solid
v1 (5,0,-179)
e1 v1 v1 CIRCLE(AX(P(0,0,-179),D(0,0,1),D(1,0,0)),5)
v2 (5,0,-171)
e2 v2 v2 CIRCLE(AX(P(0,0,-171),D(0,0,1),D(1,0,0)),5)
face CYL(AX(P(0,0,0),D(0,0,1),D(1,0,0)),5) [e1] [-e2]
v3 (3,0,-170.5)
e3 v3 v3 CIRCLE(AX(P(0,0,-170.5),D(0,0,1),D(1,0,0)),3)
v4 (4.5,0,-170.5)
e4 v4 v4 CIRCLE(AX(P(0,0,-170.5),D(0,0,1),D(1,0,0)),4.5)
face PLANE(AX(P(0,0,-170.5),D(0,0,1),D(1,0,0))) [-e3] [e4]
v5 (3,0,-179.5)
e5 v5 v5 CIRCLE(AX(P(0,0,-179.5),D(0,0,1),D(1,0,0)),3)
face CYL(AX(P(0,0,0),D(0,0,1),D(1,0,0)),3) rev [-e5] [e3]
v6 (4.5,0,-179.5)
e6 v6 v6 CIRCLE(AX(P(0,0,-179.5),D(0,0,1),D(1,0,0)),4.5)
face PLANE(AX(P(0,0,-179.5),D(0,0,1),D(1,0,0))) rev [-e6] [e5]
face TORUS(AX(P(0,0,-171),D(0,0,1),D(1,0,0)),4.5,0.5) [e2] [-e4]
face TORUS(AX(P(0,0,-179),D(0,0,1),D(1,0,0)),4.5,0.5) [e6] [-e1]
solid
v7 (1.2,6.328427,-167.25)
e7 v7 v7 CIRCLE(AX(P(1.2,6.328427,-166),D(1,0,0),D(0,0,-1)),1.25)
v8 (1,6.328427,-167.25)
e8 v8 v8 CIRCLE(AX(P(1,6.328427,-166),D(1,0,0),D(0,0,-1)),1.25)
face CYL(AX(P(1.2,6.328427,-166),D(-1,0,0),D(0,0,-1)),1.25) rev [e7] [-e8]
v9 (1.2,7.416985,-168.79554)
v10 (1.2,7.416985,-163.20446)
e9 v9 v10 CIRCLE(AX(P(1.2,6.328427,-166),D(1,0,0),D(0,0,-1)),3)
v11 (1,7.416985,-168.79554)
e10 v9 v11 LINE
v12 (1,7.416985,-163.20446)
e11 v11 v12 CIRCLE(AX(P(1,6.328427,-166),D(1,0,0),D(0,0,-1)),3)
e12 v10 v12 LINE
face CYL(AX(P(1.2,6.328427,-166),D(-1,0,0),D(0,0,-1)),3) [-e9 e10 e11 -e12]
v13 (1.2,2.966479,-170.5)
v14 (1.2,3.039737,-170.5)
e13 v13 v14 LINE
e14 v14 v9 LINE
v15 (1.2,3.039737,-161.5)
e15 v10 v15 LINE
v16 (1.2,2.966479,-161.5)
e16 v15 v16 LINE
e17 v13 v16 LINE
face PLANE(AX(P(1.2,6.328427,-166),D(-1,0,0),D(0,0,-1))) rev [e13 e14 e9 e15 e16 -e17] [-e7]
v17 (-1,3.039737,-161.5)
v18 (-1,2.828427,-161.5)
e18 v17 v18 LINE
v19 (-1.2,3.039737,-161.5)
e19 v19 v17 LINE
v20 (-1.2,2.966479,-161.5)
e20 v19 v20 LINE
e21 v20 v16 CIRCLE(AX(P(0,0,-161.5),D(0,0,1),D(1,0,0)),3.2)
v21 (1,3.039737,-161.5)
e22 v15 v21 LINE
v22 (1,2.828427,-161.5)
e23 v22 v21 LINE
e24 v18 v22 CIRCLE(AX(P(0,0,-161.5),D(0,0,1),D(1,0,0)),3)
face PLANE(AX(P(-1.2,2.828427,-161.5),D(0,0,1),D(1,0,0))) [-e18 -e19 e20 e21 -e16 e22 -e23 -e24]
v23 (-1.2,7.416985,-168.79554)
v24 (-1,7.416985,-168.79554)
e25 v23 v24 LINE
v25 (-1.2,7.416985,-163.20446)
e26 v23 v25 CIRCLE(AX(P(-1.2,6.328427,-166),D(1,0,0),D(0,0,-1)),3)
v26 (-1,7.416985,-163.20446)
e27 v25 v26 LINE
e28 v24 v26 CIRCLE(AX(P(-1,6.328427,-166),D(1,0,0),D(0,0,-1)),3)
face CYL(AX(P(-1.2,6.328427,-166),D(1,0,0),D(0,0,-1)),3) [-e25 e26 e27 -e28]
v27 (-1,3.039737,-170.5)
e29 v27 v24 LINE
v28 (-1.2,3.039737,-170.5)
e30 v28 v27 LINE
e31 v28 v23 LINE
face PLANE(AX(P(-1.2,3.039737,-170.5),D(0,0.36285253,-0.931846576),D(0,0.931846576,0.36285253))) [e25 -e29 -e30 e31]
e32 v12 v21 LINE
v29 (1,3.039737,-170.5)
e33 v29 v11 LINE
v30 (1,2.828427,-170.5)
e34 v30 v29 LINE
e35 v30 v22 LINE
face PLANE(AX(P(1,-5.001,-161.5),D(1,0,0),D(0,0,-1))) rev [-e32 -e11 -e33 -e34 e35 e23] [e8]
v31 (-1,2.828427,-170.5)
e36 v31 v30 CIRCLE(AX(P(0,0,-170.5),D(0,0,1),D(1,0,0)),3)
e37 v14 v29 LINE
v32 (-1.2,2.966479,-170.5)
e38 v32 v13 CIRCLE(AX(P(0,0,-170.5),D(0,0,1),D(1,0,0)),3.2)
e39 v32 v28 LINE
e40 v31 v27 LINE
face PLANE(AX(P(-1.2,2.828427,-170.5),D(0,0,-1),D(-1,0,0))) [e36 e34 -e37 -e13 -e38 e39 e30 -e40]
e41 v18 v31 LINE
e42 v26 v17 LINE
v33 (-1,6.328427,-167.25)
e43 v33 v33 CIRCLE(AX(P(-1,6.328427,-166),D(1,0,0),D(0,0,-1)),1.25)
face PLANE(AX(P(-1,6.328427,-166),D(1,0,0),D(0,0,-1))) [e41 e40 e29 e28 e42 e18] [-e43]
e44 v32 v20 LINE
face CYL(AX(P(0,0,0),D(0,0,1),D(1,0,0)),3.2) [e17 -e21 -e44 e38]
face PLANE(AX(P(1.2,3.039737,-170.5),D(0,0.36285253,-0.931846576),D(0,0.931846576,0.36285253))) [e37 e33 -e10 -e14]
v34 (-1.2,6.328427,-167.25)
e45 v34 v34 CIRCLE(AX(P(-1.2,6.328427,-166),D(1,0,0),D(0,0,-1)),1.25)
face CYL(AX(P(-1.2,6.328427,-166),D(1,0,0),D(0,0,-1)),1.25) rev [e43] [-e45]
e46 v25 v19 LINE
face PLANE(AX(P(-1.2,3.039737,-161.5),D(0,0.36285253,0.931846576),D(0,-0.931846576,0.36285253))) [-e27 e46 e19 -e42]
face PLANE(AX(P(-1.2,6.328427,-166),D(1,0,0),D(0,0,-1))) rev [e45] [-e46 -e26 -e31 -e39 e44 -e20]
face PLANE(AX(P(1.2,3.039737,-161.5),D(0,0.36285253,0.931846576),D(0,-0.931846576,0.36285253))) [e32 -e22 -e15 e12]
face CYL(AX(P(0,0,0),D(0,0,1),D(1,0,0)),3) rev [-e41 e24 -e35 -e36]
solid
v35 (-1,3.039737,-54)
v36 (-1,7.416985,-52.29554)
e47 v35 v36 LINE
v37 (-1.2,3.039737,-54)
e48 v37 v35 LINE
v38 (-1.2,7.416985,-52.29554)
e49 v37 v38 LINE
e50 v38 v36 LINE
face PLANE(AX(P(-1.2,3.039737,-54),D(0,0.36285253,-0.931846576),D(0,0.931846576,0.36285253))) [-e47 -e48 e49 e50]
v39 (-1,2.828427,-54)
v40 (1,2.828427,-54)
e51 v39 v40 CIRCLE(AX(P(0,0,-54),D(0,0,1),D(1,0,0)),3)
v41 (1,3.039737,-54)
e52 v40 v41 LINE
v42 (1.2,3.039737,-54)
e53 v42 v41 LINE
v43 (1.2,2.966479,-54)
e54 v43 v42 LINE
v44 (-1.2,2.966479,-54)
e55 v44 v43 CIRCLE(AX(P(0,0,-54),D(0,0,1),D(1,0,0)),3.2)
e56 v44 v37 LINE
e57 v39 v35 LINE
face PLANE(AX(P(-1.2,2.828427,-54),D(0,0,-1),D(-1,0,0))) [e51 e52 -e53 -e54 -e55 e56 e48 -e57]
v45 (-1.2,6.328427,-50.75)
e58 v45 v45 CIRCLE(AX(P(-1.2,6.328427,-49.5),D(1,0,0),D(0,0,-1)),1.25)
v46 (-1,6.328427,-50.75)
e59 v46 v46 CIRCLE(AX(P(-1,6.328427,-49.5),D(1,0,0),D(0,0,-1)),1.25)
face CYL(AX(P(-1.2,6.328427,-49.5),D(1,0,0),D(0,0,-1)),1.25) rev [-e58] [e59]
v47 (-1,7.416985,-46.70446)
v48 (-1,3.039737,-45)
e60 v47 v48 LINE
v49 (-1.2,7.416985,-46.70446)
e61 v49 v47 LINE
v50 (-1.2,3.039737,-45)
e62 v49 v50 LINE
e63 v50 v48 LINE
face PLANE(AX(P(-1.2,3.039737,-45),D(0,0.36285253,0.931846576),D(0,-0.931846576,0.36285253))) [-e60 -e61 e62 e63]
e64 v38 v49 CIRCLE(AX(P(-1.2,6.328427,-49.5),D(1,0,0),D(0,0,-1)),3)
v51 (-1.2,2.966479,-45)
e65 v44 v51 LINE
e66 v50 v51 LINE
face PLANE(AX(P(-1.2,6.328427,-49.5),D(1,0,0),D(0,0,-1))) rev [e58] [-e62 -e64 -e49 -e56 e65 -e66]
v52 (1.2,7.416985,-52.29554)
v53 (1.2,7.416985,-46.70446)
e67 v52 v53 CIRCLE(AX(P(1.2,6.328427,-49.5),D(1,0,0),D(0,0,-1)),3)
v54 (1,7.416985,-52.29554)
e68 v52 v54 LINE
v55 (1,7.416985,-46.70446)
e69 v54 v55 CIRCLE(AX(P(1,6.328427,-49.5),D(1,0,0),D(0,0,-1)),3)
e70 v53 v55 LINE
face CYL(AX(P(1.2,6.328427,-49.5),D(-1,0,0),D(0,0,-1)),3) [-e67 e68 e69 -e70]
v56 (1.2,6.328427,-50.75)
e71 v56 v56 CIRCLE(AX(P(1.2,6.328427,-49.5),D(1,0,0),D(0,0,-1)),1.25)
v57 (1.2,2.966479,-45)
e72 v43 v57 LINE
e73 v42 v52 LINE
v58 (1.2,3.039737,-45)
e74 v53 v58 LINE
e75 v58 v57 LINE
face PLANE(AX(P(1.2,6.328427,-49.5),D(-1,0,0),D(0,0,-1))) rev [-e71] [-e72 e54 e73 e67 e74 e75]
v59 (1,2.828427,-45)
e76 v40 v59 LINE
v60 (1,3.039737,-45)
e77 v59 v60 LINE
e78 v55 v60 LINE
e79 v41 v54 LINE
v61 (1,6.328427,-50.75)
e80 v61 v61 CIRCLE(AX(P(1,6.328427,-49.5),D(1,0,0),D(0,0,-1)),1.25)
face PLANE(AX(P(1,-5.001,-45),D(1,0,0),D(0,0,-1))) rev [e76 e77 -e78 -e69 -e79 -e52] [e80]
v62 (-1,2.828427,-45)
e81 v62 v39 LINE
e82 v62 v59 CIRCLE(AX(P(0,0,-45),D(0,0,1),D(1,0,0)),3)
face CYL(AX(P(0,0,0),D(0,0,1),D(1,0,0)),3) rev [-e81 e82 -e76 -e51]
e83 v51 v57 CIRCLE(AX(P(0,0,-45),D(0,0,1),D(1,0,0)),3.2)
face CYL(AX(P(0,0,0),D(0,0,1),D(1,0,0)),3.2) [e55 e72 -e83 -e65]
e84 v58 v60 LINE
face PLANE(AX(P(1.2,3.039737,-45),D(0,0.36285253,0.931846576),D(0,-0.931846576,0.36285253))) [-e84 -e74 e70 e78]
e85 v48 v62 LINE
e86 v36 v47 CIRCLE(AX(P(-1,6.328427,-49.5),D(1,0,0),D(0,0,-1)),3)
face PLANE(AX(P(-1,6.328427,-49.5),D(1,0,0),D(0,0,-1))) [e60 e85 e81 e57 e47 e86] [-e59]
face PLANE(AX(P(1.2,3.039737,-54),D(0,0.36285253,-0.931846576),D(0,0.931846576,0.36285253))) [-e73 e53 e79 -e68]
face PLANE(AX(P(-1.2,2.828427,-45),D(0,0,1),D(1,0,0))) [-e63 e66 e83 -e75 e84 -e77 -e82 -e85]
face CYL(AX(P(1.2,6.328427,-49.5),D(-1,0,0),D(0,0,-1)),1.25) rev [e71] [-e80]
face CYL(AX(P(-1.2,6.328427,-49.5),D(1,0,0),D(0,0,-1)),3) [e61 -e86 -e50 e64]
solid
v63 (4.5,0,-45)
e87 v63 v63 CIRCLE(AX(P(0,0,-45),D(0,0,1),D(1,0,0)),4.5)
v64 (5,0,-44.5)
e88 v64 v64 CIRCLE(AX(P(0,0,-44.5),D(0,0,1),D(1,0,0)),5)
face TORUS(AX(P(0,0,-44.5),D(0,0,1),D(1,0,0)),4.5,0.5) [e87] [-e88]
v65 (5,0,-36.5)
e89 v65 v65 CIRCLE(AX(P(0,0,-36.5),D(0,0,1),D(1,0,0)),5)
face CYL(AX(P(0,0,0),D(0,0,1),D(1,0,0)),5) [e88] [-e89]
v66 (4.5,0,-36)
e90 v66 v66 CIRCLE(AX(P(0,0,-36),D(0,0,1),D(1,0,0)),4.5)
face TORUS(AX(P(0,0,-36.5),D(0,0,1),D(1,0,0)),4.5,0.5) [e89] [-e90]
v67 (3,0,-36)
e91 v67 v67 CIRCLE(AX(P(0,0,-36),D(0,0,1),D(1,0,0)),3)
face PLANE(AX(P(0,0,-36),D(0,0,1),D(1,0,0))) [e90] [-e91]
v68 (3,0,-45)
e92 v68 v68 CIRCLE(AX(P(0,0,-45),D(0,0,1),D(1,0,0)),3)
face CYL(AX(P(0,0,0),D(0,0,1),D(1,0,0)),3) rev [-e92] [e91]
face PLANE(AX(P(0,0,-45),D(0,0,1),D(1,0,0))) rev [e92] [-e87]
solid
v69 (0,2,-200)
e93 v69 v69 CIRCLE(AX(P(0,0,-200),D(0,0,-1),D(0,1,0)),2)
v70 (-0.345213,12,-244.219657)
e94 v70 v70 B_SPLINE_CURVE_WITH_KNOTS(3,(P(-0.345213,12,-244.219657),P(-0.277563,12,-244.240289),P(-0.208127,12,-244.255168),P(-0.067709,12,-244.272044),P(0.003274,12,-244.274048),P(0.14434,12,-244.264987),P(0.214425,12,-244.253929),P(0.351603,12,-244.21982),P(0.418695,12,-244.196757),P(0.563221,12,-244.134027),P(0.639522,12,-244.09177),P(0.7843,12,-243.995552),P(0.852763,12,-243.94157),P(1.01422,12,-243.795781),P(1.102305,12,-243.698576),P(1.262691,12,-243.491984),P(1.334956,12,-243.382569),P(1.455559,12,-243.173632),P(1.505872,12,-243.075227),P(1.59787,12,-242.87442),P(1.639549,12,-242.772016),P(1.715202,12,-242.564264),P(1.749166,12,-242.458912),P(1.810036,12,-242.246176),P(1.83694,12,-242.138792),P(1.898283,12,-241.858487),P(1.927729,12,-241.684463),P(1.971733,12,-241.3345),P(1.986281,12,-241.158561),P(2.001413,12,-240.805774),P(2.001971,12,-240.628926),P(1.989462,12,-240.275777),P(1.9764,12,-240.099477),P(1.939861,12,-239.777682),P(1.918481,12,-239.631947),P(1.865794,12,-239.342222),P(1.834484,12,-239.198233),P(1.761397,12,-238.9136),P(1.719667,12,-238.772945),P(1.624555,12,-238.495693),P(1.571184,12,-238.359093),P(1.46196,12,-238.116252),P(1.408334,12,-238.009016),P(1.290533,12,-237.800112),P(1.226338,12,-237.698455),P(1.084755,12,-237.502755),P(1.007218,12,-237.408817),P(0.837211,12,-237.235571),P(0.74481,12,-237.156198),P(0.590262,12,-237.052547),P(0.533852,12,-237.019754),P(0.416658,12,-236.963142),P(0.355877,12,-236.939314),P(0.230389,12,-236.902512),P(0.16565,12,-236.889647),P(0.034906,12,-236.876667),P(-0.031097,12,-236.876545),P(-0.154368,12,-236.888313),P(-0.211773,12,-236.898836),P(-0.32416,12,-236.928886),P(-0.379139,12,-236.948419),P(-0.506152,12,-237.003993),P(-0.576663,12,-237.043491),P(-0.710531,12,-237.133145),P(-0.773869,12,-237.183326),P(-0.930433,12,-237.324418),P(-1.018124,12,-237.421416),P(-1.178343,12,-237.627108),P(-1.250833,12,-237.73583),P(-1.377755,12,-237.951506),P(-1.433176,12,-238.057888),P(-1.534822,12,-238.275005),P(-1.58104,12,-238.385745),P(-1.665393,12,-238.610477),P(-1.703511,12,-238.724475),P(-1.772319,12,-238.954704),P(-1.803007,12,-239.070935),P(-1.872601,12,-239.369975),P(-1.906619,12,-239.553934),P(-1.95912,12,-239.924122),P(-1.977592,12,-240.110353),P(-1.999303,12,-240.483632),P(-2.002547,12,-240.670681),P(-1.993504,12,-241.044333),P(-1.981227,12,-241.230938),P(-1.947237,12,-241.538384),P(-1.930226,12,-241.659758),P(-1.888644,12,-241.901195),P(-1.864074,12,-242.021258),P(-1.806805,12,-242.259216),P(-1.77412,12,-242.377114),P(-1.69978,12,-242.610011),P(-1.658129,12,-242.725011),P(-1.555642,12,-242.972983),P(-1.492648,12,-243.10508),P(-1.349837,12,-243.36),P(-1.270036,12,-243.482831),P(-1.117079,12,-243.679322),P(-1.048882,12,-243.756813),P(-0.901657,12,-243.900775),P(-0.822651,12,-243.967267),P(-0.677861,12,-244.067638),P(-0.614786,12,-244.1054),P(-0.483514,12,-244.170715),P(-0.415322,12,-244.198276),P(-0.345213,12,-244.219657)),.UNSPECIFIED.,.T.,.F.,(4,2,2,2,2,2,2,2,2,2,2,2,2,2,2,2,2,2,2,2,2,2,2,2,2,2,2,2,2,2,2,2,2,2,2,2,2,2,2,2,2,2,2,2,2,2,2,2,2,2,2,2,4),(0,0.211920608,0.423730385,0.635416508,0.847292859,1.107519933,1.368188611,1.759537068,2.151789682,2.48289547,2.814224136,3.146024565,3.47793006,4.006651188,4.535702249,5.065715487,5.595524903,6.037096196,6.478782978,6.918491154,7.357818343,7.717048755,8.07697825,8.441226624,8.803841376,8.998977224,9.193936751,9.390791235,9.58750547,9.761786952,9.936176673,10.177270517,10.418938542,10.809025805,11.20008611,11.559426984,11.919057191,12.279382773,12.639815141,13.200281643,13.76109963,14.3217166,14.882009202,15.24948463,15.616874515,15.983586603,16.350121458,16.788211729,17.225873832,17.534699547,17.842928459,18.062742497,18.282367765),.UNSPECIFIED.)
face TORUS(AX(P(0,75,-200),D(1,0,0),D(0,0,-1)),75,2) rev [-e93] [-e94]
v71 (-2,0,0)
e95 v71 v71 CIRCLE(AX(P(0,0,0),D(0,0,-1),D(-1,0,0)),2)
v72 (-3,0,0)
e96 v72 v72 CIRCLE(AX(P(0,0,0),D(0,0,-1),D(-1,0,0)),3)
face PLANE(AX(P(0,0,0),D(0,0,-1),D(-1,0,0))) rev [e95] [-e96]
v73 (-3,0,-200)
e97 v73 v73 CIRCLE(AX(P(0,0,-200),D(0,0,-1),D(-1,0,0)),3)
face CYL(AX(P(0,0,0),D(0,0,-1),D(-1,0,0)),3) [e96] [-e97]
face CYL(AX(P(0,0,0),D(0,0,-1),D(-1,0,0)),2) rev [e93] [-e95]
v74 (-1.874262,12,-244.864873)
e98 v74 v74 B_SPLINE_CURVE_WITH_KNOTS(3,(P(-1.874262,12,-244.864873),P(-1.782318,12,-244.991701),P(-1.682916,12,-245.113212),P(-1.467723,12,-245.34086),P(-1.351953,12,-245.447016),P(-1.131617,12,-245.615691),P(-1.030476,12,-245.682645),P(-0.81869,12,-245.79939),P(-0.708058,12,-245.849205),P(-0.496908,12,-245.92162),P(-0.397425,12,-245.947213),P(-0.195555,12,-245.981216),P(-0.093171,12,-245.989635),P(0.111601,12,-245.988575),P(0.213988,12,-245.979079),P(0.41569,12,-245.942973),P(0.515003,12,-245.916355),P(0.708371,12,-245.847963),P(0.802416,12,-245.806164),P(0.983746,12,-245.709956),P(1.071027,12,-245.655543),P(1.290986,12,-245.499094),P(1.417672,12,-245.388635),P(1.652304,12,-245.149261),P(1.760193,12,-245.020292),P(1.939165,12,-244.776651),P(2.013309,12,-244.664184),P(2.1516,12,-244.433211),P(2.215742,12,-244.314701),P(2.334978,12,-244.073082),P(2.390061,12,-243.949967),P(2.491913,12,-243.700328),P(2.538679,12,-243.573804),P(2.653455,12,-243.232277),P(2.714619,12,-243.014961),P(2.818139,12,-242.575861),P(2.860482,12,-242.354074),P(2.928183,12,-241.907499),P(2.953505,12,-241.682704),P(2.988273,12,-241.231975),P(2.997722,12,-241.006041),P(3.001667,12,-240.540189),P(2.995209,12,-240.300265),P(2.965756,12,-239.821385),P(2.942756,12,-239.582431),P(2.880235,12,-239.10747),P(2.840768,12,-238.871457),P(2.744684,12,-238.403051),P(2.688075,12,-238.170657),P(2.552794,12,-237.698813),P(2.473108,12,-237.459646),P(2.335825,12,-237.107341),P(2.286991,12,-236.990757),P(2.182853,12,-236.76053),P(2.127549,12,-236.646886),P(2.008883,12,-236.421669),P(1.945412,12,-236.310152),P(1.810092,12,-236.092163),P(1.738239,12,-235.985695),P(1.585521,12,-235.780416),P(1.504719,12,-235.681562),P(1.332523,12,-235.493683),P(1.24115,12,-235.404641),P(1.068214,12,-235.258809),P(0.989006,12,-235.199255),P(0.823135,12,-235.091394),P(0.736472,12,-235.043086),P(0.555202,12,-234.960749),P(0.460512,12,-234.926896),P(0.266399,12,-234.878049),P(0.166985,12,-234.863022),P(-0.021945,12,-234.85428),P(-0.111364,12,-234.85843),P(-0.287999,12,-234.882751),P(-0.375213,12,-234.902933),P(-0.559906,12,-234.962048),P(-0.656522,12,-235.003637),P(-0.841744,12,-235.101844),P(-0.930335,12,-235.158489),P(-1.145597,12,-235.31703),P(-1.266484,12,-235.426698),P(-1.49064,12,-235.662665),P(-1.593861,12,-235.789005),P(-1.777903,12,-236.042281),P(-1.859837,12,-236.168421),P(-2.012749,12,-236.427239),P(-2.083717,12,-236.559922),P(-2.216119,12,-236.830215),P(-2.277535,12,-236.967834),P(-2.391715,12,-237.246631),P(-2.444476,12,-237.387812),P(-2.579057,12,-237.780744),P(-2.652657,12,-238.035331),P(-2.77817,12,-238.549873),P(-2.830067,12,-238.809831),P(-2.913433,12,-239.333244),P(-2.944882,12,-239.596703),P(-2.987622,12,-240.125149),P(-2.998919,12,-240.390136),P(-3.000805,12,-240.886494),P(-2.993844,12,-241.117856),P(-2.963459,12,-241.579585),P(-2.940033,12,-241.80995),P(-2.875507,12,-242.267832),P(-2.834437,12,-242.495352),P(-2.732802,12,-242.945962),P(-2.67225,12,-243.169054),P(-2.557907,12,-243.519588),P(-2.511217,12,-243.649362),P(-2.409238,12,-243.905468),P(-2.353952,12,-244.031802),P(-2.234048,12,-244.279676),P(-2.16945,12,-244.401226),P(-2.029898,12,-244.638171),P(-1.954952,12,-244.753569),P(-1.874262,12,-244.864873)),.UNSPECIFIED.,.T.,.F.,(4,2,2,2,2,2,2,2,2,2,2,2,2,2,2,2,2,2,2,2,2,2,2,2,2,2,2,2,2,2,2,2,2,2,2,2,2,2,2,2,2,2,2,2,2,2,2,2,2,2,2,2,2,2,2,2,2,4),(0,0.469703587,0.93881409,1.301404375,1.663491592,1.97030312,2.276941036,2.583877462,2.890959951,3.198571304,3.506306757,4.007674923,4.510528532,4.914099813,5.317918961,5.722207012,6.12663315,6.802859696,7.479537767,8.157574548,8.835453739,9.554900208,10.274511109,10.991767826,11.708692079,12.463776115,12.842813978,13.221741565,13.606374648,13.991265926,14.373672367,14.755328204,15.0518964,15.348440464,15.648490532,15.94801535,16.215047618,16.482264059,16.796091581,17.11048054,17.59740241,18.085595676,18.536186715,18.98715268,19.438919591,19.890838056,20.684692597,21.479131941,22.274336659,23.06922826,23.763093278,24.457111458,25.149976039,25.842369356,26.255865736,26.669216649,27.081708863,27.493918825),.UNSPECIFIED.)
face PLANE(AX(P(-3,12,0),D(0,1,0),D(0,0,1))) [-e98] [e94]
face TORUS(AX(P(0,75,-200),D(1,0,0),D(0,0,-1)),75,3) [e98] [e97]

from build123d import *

# Parameters (mm, degrees)
BARRER_L_MINA1_PROFILE_R    = 3
BARRER_L_MINA1_PROFILE_R_2  = 2
BARRER_L_MINA2_PROFILE_R    = 3
BARRER_L_MINA2_PROFILE_R_2  = 2
CORTAR_EXTRUIR1_DEPTH       = 276.631598791
CORTAR_EXTRUIR1_DEPTH_BACK  = 276.631598791
CROQUIS31_OUTSIDE_W         = 328.895
CROQUIS31_OUTSIDE_H         = 106.795
CROQUIS31_OUTSIDE_W_2       = 245.98912915
CROQUIS31_OUTSIDE_H_2       = 15
CROQUIS34_W                 = 0.2
CROQUIS34_H                 = 9
CORTAR_EXTRUIR2_START       = -7.171572875
CORTAR_EXTRUIR2_OUTLINE_W   = 2
CORTAR_EXTRUIR2_OUTLINE_H   = 9
CORTAR_EXTRUIR2_DEPTH       = 0.371572875
CORTAR_EXTRUIR2_2_OUTLINE_W = 2
CORTAR_EXTRUIR2_2_OUTLINE_H = 9
CORTAR_EXTRUIR2_2_DEPTH     = 0.371572875
CROQUIS37_R                 = 1.25
SALIENTE_EXTRUIR3_DEPTH     = 0.2
SALIENTE_EXTRUIR3_2_DEPTH   = 0.2


# Read off the part's stored shape, not the designer's step: Cortar-Extruir2
with BuildPart() as part:
    # Barrer-Lámina1: sweep along a path in Croquis1
    with BuildLine(Plane(origin=(0, 0, 0), x_dir=(0, 0, -1), z_dir=(1, 0, 0))) as barrer_l_mina1_path:
        Line((0, 0), (200, 0))
    # Barrer-Lámina1 profile (on start of the path) → Barrer-Lámina1 (sweep)
    with BuildSketch(Plane(origin=(0, 0, 0), x_dir=(-1, 0, 0), z_dir=(0, 0, -1))):
        Circle(BARRER_L_MINA1_PROFILE_R)
        Circle(BARRER_L_MINA1_PROFILE_R_2, mode=Mode.SUBTRACT)
    sweep(path=barrer_l_mina1_path.line)

    # Barrer-Lámina2: sweep along a path in Croquis18
    with BuildLine(Plane(origin=(0, 0, 0), x_dir=(0, 0, -1), z_dir=(1, 0, 0))) as barrer_l_mina2_path:
        ThreePointArc((200, 0), (241.247743029, 12.361164642), (268.89894892, 45.3700348))
    # Barrer-Lámina2 profile (on start of the path) → Barrer-Lámina2 (sweep)
    with BuildSketch(Plane(origin=(0, 0, -200), x_dir=(-1, 0, 0), z_dir=(0, 0, -1))):
        Circle(BARRER_L_MINA2_PROFILE_R)
        Circle(BARRER_L_MINA2_PROFILE_R_2, mode=Mode.SUBTRACT)
    sweep(path=barrer_l_mina2_path.line)

    # Croquis31 outside → Cortar-Extruir1 (cut, two sides: drawn at the far end of the back side and taken through both)
    with BuildSketch(Plane(origin=(0, 0, 0), x_dir=(0, 0, -1), z_dir=(1, 0, 0)).offset(-CORTAR_EXTRUIR1_DEPTH_BACK)):
        with Locations((135.8275, 21.7775)):
            Rectangle(CROQUIS31_OUTSIDE_W, CROQUIS31_OUTSIDE_H)
        with Locations((122.994564575, 4.5)):
            Rectangle(CROQUIS31_OUTSIDE_W_2, CROQUIS31_OUTSIDE_H_2, mode=Mode.SUBTRACT)
    extrude(amount=CORTAR_EXTRUIR1_DEPTH + CORTAR_EXTRUIR1_DEPTH_BACK, mode=Mode.SUBTRACT)


with BuildPart() as body_2:
    # Croquis33 → Revolución1 (revolve)
    with BuildSketch(Plane(origin=(0, 0, 0), x_dir=(0, 0, -1), z_dir=(1, 0, 0)), mode=Mode.PRIVATE) as revoluci_n1_sk:
        with BuildLine():
            ThreePointArc((36, 4.5), (36.146446609, 4.853553391), (36.5, 5))
            Line((36.5, 5), (44.5, 5))
            ThreePointArc((44.5, 5), (44.853553391, 4.853553391), (45, 4.5))
            Line((45, 4.5), (45, 3))
            Line((45, 3), (36, 3))
            Line((36, 3), (36, 4.5))
        make_face()
        with BuildLine():
            ThreePointArc((170.5, 4.5), (170.646446609, 4.853553391), (171, 5))
            Line((171, 5), (179, 5))
            ThreePointArc((179, 5), (179.353553391, 4.853553391), (179.5, 4.5))
            Line((179.5, 4.5), (179.5, 3))
            Line((179.5, 3), (170.5, 3))
            Line((170.5, 3), (170.5, 4.5))
        make_face()
    revolve(revoluci_n1_sk.sketch.rotate(Axis((0, 0, 0), (0, 0, -1)), 90), axis=Axis((0, 0, 0), (0, 0, -1)))


with BuildPart() as body_3:
    # Croquis34 → Revolución2 (revolve)
    with BuildSketch(Plane(origin=(0, 0, 0), x_dir=(1, 0, 0), z_dir=(0, 1, 0)), mode=Mode.PRIVATE) as revoluci_n2_sk:
        with Locations((-3.1, 166)):
            Rectangle(CROQUIS34_W, CROQUIS34_H)
        with Locations((-3.1, 49.5)):
            Rectangle(CROQUIS34_W, CROQUIS34_H)
    revolve(revoluci_n2_sk.sketch.rotate(Axis((0, 0, 0), (0, 0, -1)), 180), axis=Axis((0, 0, 0), (0, 0, -1)))

    # Cortar-Extruir2 outline → Cortar-Extruir2 (cut)
    with BuildSketch(Plane(origin=(0, 10, 0), x_dir=(1, 0, 0), z_dir=(0, 1, 0)).offset(CORTAR_EXTRUIR2_START)):
        with Locations((0, 166)):
            Rectangle(CORTAR_EXTRUIR2_OUTLINE_W, CORTAR_EXTRUIR2_OUTLINE_H)
    extrude(amount=CORTAR_EXTRUIR2_DEPTH, mode=Mode.SUBTRACT)

    # Cortar-Extruir2 2 outline → Cortar-Extruir2 2 (cut)
    with BuildSketch(Plane(origin=(0, 10, 0), x_dir=(1, 0, 0), z_dir=(0, 1, 0)).offset(CORTAR_EXTRUIR2_START)):
        with Locations((0, 49.5)):
            Rectangle(CORTAR_EXTRUIR2_2_OUTLINE_W, CORTAR_EXTRUIR2_2_OUTLINE_H)
    extrude(amount=CORTAR_EXTRUIR2_2_DEPTH, mode=Mode.SUBTRACT)


with BuildPart() as body_4:
    # Croquis37 → Saliente-Extruir3 (new body)
    with BuildSketch(Plane(origin=(-1, 0, 0), x_dir=(0, 0, -1), z_dir=(1, 0, 0))):
        with BuildLine():
            Line((170.5, 2.828427125), (161.5, 2.828427125))
            Line((161.5, 2.828427125), (161.5, 3.039736831))
            Line((161.5, 3.039736831), (163.204460271, 7.416984714))
            ThreePointArc((163.204460271, 7.416984714), (166, 9.328427125), (168.795539729, 7.416984714))
            Line((168.795539729, 7.416984714), (170.5, 3.039736831))
            Line((170.5, 3.039736831), (170.5, 2.828427125))
        make_face()
        with Locations((166, 6.328427125)):
            Circle(CROQUIS37_R, mode=Mode.SUBTRACT)
    saliente_extruir3 = extrude(amount=-SALIENTE_EXTRUIR3_DEPTH)


with BuildPart() as body_5:
    # Croquis37 → Saliente-Extruir3 2 (new body)
    with BuildSketch(Plane(origin=(-1, 0, 0), x_dir=(0, 0, -1), z_dir=(1, 0, 0))):
        with BuildLine():
            Line((45, 3.039736831), (46.704460271, 7.416984714))
            ThreePointArc((46.704460271, 7.416984714), (49.5, 9.328427125), (52.295539729, 7.416984714))
            Line((52.295539729, 7.416984714), (54, 3.039736831))
            Line((54, 3.039736831), (54, 2.828427125))
            Line((54, 2.828427125), (45, 2.828427125))
            Line((45, 2.828427125), (45, 3.039736831))
        make_face()
        with Locations((49.5, 6.328427125)):
            Circle(CROQUIS37_R, mode=Mode.SUBTRACT)
    saliente_extruir3_2 = extrude(amount=-SALIENTE_EXTRUIR3_2_DEPTH)


with BuildPart() as body_3_1:
    add(body_3.part)

    # Simetría2: Saliente-Extruir3, Saliente-Extruir3 2 across plane
    add(saliente_extruir3.mirror(Plane(origin=(0, 0, 0), x_dir=(0, 0, 1), z_dir=(1, 0, 0))))
    add(saliente_extruir3_2.mirror(Plane(origin=(0, 0, 0), x_dir=(0, 0, 1), z_dir=(1, 0, 0))))


with BuildPart() as body_5_1:
    add(body_5.part)

    # Combinar1: union body 3
    add(body_3_1.part)


with BuildPart() as body_4_1:
    add(body_4.part)

    # Combinar2: union body 5
    add(body_5_1.part)


solid = Compound([part.part, body_2.part, body_4_1.part])
